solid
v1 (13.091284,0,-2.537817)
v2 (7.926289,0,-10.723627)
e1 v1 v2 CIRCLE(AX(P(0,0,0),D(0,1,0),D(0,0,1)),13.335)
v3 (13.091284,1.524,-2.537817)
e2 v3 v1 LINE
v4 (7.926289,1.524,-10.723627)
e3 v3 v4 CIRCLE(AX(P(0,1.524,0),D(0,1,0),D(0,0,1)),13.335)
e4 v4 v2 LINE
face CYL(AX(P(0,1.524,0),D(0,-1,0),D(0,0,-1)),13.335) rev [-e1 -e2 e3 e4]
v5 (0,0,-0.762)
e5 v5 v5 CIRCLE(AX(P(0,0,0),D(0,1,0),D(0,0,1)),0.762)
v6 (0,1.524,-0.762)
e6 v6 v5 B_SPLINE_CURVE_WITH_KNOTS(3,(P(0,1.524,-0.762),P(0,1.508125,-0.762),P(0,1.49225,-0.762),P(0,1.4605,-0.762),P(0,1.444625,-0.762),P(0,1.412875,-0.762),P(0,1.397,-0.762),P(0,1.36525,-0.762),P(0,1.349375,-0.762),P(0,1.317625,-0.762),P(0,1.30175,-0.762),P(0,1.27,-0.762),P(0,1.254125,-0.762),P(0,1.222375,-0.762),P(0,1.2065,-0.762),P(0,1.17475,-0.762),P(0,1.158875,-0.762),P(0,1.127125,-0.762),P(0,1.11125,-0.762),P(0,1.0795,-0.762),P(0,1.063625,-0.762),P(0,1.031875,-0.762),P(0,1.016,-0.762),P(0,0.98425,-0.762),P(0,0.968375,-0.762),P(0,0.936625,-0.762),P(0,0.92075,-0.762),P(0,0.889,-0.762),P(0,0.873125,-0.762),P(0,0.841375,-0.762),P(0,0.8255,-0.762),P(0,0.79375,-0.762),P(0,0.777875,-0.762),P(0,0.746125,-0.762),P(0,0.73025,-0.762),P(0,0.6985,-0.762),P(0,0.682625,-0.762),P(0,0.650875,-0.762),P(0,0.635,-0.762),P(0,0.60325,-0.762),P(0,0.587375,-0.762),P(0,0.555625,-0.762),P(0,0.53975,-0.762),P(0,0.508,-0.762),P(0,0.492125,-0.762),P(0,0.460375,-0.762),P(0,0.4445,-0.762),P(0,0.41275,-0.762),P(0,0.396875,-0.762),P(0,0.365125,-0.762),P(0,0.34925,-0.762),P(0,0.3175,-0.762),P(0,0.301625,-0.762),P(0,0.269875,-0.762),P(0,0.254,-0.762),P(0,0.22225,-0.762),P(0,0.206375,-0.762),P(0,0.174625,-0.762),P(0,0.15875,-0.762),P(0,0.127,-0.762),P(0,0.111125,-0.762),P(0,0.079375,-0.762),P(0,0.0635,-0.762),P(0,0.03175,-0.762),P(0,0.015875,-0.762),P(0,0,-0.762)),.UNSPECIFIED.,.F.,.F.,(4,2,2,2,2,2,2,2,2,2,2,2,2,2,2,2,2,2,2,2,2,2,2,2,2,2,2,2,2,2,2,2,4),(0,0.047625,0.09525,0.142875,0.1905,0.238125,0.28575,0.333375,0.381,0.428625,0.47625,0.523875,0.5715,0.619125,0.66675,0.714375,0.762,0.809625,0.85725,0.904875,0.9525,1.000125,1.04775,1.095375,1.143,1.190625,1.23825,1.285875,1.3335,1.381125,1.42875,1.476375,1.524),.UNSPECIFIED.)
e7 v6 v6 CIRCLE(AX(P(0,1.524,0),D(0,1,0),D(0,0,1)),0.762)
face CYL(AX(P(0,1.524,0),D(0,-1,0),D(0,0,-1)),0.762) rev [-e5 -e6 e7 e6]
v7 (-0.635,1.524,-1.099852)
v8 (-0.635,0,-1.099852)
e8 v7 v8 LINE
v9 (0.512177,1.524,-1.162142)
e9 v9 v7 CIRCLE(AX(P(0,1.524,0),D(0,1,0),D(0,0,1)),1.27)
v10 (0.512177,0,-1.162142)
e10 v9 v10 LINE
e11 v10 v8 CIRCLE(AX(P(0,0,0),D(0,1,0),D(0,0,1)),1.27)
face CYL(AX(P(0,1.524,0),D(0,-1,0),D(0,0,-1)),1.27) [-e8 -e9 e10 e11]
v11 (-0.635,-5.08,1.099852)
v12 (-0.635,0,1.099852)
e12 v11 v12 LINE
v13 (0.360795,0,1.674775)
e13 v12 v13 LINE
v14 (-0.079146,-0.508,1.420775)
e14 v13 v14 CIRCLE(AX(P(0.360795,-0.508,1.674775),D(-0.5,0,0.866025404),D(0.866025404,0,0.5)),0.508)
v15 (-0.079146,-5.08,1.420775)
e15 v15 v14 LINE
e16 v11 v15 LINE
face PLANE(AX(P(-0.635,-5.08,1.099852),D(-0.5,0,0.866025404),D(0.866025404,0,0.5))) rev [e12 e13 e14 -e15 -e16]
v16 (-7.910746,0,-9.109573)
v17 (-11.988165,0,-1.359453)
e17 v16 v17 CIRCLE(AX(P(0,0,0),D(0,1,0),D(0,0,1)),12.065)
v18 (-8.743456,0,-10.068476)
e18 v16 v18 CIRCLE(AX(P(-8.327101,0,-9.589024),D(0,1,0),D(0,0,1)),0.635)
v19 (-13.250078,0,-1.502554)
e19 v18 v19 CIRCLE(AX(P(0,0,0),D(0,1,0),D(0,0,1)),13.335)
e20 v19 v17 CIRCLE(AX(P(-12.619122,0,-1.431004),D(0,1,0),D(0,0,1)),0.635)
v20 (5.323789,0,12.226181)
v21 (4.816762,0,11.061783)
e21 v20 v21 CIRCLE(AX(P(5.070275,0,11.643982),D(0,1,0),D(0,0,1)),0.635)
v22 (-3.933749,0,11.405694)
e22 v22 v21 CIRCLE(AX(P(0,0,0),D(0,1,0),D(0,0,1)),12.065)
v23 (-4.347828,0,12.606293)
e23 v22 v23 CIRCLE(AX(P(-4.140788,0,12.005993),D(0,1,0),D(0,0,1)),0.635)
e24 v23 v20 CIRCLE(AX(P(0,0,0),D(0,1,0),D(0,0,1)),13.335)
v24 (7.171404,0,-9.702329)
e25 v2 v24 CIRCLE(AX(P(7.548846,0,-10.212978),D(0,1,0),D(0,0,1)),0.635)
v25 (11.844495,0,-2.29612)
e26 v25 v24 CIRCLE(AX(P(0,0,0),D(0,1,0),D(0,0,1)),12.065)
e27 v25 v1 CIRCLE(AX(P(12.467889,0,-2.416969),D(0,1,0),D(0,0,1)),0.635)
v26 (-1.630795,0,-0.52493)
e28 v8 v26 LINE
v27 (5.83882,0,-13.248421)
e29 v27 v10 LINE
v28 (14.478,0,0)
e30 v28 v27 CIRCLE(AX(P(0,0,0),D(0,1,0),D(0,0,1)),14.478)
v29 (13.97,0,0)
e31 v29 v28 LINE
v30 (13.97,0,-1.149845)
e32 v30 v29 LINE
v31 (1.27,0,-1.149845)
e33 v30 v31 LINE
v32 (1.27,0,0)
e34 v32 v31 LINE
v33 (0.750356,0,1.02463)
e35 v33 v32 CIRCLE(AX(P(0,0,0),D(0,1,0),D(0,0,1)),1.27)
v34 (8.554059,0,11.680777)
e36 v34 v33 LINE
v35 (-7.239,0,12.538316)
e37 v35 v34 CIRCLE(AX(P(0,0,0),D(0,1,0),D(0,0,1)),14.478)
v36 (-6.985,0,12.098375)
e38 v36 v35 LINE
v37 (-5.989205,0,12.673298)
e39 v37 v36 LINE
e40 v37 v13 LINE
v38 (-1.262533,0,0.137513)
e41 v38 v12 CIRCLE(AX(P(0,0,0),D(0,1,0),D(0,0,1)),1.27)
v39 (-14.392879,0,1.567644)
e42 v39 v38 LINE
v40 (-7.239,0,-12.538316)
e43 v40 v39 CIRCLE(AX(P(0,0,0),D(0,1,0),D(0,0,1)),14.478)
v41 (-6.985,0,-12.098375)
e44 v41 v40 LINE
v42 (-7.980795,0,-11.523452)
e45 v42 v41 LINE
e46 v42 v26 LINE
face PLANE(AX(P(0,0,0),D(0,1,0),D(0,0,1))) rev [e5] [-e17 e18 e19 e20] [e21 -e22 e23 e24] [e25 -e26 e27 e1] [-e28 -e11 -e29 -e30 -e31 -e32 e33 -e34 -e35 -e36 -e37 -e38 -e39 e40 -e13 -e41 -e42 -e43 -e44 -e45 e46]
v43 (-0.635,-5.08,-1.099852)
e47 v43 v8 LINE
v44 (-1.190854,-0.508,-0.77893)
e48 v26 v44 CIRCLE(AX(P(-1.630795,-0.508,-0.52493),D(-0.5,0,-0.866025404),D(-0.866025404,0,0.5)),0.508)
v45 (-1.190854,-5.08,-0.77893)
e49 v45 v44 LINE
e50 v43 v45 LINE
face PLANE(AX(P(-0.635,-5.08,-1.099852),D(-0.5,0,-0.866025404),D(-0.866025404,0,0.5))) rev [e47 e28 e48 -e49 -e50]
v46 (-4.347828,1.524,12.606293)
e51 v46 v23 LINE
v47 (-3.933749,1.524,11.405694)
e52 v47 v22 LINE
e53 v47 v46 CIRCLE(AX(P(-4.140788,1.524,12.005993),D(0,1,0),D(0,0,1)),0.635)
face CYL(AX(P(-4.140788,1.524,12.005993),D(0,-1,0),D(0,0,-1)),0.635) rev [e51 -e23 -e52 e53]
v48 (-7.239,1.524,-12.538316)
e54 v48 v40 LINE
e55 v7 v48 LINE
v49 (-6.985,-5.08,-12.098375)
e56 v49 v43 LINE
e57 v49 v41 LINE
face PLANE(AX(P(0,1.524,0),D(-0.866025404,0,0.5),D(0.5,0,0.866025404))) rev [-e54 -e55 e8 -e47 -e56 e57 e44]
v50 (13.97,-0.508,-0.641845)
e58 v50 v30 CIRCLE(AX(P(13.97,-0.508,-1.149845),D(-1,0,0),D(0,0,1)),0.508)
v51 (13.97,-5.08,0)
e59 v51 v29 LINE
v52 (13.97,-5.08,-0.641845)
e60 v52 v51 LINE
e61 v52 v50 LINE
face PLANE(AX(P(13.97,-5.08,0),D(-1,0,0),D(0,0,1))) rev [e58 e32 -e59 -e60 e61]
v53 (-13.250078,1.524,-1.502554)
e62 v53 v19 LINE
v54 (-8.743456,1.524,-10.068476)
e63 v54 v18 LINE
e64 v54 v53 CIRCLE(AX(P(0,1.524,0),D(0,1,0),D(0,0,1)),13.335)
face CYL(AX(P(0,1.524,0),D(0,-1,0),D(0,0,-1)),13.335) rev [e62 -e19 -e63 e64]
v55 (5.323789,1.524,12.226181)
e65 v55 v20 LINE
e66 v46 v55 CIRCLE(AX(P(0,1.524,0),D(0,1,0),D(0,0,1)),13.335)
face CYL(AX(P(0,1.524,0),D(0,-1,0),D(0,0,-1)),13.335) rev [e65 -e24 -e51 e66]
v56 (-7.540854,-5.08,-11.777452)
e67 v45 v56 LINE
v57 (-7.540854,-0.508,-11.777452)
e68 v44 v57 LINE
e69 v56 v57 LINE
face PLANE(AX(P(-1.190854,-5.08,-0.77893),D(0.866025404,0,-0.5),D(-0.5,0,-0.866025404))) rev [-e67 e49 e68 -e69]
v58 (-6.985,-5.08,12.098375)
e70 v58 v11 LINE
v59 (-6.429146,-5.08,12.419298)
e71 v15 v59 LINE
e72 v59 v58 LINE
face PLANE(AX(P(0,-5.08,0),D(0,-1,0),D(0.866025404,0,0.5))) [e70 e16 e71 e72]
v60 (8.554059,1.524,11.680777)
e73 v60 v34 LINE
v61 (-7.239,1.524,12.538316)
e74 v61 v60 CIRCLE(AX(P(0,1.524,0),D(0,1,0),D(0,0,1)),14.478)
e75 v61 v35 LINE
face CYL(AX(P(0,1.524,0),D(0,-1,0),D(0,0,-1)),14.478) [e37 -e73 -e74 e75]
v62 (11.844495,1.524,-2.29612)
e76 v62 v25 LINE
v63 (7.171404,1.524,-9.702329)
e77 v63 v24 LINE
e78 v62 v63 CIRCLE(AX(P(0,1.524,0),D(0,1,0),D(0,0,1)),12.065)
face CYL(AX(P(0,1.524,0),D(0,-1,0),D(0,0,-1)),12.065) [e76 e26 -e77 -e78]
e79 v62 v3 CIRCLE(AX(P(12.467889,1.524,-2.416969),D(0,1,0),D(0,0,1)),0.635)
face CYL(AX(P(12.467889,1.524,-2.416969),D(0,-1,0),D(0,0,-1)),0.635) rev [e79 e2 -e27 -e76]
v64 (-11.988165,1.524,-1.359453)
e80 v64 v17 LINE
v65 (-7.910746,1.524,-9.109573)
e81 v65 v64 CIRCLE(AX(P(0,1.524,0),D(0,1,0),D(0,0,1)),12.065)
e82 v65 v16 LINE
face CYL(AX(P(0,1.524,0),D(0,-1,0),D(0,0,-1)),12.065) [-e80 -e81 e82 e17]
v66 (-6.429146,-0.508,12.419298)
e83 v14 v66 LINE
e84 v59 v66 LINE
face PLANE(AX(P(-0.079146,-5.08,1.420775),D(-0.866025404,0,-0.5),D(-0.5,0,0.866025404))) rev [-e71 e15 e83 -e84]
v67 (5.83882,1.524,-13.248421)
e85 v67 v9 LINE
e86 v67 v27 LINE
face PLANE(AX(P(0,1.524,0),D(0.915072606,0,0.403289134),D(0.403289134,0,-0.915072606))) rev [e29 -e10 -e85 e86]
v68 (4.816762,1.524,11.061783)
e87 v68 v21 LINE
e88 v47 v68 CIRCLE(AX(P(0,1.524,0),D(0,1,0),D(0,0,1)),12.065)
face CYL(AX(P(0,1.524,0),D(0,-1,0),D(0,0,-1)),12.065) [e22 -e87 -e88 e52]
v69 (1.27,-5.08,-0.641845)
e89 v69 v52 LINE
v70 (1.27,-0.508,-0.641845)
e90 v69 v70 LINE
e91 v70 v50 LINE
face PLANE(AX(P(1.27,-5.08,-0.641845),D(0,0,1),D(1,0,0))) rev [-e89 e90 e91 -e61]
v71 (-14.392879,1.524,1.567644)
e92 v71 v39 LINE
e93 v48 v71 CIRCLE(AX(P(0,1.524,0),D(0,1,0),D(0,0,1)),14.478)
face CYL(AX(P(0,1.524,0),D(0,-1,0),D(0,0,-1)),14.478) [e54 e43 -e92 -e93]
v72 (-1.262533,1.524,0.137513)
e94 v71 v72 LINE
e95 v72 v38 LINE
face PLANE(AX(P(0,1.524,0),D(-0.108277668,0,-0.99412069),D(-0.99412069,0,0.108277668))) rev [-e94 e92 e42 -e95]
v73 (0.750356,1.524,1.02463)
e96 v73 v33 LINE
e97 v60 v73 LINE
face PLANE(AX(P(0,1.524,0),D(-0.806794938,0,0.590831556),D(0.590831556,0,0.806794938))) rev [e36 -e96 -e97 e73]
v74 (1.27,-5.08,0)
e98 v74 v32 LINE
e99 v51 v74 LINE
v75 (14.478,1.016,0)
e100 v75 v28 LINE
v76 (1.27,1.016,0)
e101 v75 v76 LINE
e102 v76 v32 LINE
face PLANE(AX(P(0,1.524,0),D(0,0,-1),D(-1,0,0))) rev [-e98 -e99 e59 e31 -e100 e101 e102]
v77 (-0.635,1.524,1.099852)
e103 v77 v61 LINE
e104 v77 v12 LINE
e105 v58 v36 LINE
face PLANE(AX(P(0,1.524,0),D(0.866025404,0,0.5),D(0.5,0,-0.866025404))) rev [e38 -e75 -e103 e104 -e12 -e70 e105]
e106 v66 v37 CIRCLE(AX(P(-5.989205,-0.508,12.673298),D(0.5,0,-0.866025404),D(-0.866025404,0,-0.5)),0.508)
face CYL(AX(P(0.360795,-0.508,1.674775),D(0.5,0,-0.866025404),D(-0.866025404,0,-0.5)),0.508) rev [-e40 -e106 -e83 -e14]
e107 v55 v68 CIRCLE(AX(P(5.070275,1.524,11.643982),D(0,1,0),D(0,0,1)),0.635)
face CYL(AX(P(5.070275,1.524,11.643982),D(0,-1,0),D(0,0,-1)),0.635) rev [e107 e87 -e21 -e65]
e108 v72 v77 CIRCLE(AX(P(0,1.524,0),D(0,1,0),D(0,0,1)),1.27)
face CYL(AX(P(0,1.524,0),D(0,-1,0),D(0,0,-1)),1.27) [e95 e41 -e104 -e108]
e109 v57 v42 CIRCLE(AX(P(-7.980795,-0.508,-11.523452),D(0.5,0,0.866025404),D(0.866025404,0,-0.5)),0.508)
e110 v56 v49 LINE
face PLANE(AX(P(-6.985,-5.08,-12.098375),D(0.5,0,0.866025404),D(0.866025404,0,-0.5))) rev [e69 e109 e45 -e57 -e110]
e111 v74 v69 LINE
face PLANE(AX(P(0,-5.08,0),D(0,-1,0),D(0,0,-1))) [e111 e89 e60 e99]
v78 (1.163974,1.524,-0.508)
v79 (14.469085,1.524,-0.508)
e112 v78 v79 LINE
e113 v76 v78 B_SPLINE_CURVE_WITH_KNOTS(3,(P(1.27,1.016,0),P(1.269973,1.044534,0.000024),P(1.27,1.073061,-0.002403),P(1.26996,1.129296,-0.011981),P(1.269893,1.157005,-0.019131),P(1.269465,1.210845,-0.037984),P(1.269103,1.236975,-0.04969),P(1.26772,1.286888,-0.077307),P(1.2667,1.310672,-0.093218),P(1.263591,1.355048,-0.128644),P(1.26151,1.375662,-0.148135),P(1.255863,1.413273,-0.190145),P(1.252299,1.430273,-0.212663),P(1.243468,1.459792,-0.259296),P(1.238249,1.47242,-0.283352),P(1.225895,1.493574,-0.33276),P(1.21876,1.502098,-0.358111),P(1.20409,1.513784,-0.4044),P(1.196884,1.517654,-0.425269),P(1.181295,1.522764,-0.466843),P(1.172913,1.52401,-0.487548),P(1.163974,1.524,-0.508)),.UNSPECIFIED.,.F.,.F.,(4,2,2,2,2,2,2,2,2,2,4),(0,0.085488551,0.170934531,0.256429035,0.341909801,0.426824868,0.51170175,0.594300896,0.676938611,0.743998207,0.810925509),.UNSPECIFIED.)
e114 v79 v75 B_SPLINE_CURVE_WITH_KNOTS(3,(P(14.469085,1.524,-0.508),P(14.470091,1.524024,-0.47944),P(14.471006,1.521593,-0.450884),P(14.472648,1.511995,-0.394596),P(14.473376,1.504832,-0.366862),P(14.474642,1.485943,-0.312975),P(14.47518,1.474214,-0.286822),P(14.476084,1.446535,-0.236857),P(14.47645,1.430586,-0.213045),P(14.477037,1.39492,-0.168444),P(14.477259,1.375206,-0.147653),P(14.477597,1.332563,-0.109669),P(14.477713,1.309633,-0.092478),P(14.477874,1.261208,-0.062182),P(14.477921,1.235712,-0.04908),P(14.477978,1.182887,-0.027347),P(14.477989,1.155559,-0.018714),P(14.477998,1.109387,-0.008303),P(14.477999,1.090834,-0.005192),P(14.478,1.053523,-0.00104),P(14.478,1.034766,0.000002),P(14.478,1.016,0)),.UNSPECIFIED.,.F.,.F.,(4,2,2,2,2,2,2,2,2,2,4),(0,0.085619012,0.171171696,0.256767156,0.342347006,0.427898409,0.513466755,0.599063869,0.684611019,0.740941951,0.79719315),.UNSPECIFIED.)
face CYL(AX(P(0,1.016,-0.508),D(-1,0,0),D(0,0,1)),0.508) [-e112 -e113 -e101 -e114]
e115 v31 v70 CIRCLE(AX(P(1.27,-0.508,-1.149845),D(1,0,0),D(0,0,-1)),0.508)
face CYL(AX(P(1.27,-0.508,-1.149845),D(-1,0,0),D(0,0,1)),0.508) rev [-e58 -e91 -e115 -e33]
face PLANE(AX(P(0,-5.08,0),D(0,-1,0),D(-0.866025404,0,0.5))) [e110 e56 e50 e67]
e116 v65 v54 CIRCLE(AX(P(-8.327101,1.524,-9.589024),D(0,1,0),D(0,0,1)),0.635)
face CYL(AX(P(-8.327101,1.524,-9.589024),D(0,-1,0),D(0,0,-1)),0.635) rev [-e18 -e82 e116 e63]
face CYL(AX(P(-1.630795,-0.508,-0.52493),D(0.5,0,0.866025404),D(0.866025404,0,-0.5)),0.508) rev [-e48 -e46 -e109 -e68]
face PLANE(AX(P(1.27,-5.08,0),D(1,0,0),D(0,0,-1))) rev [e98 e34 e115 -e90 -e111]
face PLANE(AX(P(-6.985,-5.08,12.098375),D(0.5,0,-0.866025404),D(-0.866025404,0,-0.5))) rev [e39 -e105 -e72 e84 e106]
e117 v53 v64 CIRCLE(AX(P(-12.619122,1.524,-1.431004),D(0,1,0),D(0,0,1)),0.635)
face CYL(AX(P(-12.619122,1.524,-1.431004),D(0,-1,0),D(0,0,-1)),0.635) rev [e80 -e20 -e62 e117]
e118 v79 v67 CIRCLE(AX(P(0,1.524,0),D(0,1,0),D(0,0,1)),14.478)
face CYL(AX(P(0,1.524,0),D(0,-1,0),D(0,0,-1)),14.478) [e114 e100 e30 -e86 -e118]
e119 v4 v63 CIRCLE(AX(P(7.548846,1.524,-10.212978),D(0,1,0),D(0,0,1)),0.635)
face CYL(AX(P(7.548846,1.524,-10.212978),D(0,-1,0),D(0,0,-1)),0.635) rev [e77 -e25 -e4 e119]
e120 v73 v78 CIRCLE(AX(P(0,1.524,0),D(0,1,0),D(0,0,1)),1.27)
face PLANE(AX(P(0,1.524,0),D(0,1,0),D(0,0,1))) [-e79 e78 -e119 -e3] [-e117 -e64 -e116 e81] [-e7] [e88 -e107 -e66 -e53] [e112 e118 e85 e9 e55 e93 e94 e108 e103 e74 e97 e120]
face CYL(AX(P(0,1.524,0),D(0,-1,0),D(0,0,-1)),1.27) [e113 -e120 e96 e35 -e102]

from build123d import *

# Parameters (mm, degrees)
SKETCH1_R           = 0.762
BOSS_EXTRUDE1_DEPTH = 1.524
SKETCH2_W           = 12.7
SKETCH2_H           = 0.641845345
BOSS_EXTRUDE2_DEPTH = 5.08
FILLET1_R           = 0.508
CIRPATTERN1_START   = -13.97
CIRPATTERN1_DEPTH   = 12.7
CIRPATTERN1_2_DEPTH = 12.7


# Read off the part's stored shape, not the designer's step: CirPattern1
with BuildPart() as part:
    # Sketch1 → Boss-Extrude1 (new body)
    with BuildSketch(Plane(origin=(0, 0, 0), x_dir=(1, 0, 0), z_dir=(0, 1, 0))):
        with BuildLine():
            Line((1.27, 0), (14.478, 0))
            ThreePointArc((14.478, 0), (12.127384736, 7.908161825), (5.838820078, 13.248421193))
            Line((5.838820078, 13.248421193), (0.5121772, 1.16214221))
            ThreePointArc((0.5121772, 1.16214221), (-0.068857603, 1.268131945), (-0.635, 1.099852263))
            Line((-0.635, 1.099852263), (-7.239, 12.538315796))
            ThreePointArc((-7.239, 12.538315796), (-12.912361406, 6.548542351), (-14.392879352, -1.56764408))
            Line((-14.392879352, -1.56764408), (-1.262533276, -0.137512639))
            ThreePointArc((-1.262533276, -0.137512639), (-1.063805679, -0.693698406), (-0.635, -1.099852263))
            Line((-0.635, -1.099852263), (-7.239, -12.538315796))
            ThreePointArc((-7.239, -12.538315796), (0.78497667, -14.456704176), (8.554059274, -11.680777112))
            Line((8.554059274, -11.680777112), (0.750356077, -1.024629571))
            ThreePointArc((0.750356077, -1.024629571), (1.132663281, -0.57443354), (1.27, 0))
        make_face()
        with Locations(Location((0, 0, 0), (0, 0, 90))):
            Circle(SKETCH1_R, mode=Mode.SUBTRACT)
        with BuildLine():
            ThreePointArc((13.091283697, 2.537817206), (12.588737673, 1.793574306), (11.844494773, 2.296120329))
            ThreePointArc((11.844494773, 2.296120329), (10.203630871, 6.438178474), (7.171403907, 9.702329153))
            ThreePointArc((7.171403907, 9.702329153), (7.038197315, 10.590420367), (7.926288529, 10.723626959))
            ThreePointArc((7.926288529, 10.723626959), (11.277697278, 7.115881471), (13.091283697, 2.537817206))
        make_face(mode=Mode.SUBTRACT)
        with BuildLine():
            ThreePointArc((-4.347827678, -12.606292852), (-4.741087925, -11.79895378), (-3.933748852, -11.405693533))
            ThreePointArc((-3.933748852, -11.405693533), (0.473810677, -12.055692782), (4.816761569, -11.061782541))
            ThreePointArc((4.816761569, -11.061782541), (5.652474417, -11.390467855), (5.323789103, -12.226180703))
            ThreePointArc((5.323789103, -12.226180703), (0.523685485, -13.324713074), (-4.347827678, -12.606292852))
        make_face(mode=Mode.SUBTRACT)
        with BuildLine():
            ThreePointArc((-8.743456019, 10.068475647), (-7.847649749, 10.005379474), (-7.910745922, 9.109573204))
            ThreePointArc((-7.910745922, 9.109573204), (-10.677441547, 5.617514308), (-11.988165476, 1.359453388))
            ThreePointArc((-11.988165476, 1.359453388), (-12.690671732, 0.800047488), (-13.250077632, 1.502553744))
            ThreePointArc((-13.250077632, 1.502553744), (-11.801382763, 6.208831604), (-8.743456019, 10.068475647))
        make_face(mode=Mode.SUBTRACT)
    extrude(amount=BOSS_EXTRUDE1_DEPTH)

    # Sketch2 → Boss-Extrude2 (add)
    with BuildSketch(Plane.XZ):
        with Locations((7.62, -0.320922673)):
            Rectangle(SKETCH2_W, SKETCH2_H)
    extrude(amount=BOSS_EXTRUDE2_DEPTH)

    # Fillet1
    fillet1_edges = [part.edges().sort_by_distance(p)[0] for p in [
        (7.62, 0, -0.641845345),
        (7.874, 1.524, 0),
    ]]
    fillet(fillet1_edges, radius=FILLET1_R)

    # CirPattern1 outline → CirPattern1 (add)
    with BuildSketch(Plane(origin=(0, 0, 0), x_dir=(0.8660254037844362, 0, -0.5000000000000042), z_dir=(0.5000000000000042, 0, 0.8660254037844363)).offset(CIRPATTERN1_START)):
        with BuildLine():
            Line((-0.641845345, -0.508), (-0.641845345, -5.08))
            Line((-0.641845345, -5.08), (0, -5.08))
            Line((0, -5.08), (0, 0))
            Line((0, 0), (-1.149845345, 0))
            ThreePointArc((-1.149845345, 0), (-0.7906351, -0.148789755), (-0.641845345, -0.508))
        make_face()
    extrude(amount=CIRPATTERN1_DEPTH)

    # CirPattern1 2 outline → CirPattern1 2 (add)
    with BuildSketch(Plane(origin=(0, 0, 0), x_dir=(0.8660254037844431, 0, 0.4999999999999921), z_dir=(0.4999999999999921, 0, -0.8660254037844433)).offset(CIRPATTERN1_START)):
        with BuildLine():
            Line((0.641845345, 0.508), (0.641845345, 5.08))
            Line((0.641845345, 5.08), (0, 5.08))
            Line((0, 5.08), (0, 0))
            Line((0, 0), (1.149845345, 0))
            ThreePointArc((1.149845345, 0), (0.7906351, 0.148789755), (0.641845345, 0.508))
        make_face()
    extrude(amount=CIRPATTERN1_2_DEPTH)


solid = part.part
